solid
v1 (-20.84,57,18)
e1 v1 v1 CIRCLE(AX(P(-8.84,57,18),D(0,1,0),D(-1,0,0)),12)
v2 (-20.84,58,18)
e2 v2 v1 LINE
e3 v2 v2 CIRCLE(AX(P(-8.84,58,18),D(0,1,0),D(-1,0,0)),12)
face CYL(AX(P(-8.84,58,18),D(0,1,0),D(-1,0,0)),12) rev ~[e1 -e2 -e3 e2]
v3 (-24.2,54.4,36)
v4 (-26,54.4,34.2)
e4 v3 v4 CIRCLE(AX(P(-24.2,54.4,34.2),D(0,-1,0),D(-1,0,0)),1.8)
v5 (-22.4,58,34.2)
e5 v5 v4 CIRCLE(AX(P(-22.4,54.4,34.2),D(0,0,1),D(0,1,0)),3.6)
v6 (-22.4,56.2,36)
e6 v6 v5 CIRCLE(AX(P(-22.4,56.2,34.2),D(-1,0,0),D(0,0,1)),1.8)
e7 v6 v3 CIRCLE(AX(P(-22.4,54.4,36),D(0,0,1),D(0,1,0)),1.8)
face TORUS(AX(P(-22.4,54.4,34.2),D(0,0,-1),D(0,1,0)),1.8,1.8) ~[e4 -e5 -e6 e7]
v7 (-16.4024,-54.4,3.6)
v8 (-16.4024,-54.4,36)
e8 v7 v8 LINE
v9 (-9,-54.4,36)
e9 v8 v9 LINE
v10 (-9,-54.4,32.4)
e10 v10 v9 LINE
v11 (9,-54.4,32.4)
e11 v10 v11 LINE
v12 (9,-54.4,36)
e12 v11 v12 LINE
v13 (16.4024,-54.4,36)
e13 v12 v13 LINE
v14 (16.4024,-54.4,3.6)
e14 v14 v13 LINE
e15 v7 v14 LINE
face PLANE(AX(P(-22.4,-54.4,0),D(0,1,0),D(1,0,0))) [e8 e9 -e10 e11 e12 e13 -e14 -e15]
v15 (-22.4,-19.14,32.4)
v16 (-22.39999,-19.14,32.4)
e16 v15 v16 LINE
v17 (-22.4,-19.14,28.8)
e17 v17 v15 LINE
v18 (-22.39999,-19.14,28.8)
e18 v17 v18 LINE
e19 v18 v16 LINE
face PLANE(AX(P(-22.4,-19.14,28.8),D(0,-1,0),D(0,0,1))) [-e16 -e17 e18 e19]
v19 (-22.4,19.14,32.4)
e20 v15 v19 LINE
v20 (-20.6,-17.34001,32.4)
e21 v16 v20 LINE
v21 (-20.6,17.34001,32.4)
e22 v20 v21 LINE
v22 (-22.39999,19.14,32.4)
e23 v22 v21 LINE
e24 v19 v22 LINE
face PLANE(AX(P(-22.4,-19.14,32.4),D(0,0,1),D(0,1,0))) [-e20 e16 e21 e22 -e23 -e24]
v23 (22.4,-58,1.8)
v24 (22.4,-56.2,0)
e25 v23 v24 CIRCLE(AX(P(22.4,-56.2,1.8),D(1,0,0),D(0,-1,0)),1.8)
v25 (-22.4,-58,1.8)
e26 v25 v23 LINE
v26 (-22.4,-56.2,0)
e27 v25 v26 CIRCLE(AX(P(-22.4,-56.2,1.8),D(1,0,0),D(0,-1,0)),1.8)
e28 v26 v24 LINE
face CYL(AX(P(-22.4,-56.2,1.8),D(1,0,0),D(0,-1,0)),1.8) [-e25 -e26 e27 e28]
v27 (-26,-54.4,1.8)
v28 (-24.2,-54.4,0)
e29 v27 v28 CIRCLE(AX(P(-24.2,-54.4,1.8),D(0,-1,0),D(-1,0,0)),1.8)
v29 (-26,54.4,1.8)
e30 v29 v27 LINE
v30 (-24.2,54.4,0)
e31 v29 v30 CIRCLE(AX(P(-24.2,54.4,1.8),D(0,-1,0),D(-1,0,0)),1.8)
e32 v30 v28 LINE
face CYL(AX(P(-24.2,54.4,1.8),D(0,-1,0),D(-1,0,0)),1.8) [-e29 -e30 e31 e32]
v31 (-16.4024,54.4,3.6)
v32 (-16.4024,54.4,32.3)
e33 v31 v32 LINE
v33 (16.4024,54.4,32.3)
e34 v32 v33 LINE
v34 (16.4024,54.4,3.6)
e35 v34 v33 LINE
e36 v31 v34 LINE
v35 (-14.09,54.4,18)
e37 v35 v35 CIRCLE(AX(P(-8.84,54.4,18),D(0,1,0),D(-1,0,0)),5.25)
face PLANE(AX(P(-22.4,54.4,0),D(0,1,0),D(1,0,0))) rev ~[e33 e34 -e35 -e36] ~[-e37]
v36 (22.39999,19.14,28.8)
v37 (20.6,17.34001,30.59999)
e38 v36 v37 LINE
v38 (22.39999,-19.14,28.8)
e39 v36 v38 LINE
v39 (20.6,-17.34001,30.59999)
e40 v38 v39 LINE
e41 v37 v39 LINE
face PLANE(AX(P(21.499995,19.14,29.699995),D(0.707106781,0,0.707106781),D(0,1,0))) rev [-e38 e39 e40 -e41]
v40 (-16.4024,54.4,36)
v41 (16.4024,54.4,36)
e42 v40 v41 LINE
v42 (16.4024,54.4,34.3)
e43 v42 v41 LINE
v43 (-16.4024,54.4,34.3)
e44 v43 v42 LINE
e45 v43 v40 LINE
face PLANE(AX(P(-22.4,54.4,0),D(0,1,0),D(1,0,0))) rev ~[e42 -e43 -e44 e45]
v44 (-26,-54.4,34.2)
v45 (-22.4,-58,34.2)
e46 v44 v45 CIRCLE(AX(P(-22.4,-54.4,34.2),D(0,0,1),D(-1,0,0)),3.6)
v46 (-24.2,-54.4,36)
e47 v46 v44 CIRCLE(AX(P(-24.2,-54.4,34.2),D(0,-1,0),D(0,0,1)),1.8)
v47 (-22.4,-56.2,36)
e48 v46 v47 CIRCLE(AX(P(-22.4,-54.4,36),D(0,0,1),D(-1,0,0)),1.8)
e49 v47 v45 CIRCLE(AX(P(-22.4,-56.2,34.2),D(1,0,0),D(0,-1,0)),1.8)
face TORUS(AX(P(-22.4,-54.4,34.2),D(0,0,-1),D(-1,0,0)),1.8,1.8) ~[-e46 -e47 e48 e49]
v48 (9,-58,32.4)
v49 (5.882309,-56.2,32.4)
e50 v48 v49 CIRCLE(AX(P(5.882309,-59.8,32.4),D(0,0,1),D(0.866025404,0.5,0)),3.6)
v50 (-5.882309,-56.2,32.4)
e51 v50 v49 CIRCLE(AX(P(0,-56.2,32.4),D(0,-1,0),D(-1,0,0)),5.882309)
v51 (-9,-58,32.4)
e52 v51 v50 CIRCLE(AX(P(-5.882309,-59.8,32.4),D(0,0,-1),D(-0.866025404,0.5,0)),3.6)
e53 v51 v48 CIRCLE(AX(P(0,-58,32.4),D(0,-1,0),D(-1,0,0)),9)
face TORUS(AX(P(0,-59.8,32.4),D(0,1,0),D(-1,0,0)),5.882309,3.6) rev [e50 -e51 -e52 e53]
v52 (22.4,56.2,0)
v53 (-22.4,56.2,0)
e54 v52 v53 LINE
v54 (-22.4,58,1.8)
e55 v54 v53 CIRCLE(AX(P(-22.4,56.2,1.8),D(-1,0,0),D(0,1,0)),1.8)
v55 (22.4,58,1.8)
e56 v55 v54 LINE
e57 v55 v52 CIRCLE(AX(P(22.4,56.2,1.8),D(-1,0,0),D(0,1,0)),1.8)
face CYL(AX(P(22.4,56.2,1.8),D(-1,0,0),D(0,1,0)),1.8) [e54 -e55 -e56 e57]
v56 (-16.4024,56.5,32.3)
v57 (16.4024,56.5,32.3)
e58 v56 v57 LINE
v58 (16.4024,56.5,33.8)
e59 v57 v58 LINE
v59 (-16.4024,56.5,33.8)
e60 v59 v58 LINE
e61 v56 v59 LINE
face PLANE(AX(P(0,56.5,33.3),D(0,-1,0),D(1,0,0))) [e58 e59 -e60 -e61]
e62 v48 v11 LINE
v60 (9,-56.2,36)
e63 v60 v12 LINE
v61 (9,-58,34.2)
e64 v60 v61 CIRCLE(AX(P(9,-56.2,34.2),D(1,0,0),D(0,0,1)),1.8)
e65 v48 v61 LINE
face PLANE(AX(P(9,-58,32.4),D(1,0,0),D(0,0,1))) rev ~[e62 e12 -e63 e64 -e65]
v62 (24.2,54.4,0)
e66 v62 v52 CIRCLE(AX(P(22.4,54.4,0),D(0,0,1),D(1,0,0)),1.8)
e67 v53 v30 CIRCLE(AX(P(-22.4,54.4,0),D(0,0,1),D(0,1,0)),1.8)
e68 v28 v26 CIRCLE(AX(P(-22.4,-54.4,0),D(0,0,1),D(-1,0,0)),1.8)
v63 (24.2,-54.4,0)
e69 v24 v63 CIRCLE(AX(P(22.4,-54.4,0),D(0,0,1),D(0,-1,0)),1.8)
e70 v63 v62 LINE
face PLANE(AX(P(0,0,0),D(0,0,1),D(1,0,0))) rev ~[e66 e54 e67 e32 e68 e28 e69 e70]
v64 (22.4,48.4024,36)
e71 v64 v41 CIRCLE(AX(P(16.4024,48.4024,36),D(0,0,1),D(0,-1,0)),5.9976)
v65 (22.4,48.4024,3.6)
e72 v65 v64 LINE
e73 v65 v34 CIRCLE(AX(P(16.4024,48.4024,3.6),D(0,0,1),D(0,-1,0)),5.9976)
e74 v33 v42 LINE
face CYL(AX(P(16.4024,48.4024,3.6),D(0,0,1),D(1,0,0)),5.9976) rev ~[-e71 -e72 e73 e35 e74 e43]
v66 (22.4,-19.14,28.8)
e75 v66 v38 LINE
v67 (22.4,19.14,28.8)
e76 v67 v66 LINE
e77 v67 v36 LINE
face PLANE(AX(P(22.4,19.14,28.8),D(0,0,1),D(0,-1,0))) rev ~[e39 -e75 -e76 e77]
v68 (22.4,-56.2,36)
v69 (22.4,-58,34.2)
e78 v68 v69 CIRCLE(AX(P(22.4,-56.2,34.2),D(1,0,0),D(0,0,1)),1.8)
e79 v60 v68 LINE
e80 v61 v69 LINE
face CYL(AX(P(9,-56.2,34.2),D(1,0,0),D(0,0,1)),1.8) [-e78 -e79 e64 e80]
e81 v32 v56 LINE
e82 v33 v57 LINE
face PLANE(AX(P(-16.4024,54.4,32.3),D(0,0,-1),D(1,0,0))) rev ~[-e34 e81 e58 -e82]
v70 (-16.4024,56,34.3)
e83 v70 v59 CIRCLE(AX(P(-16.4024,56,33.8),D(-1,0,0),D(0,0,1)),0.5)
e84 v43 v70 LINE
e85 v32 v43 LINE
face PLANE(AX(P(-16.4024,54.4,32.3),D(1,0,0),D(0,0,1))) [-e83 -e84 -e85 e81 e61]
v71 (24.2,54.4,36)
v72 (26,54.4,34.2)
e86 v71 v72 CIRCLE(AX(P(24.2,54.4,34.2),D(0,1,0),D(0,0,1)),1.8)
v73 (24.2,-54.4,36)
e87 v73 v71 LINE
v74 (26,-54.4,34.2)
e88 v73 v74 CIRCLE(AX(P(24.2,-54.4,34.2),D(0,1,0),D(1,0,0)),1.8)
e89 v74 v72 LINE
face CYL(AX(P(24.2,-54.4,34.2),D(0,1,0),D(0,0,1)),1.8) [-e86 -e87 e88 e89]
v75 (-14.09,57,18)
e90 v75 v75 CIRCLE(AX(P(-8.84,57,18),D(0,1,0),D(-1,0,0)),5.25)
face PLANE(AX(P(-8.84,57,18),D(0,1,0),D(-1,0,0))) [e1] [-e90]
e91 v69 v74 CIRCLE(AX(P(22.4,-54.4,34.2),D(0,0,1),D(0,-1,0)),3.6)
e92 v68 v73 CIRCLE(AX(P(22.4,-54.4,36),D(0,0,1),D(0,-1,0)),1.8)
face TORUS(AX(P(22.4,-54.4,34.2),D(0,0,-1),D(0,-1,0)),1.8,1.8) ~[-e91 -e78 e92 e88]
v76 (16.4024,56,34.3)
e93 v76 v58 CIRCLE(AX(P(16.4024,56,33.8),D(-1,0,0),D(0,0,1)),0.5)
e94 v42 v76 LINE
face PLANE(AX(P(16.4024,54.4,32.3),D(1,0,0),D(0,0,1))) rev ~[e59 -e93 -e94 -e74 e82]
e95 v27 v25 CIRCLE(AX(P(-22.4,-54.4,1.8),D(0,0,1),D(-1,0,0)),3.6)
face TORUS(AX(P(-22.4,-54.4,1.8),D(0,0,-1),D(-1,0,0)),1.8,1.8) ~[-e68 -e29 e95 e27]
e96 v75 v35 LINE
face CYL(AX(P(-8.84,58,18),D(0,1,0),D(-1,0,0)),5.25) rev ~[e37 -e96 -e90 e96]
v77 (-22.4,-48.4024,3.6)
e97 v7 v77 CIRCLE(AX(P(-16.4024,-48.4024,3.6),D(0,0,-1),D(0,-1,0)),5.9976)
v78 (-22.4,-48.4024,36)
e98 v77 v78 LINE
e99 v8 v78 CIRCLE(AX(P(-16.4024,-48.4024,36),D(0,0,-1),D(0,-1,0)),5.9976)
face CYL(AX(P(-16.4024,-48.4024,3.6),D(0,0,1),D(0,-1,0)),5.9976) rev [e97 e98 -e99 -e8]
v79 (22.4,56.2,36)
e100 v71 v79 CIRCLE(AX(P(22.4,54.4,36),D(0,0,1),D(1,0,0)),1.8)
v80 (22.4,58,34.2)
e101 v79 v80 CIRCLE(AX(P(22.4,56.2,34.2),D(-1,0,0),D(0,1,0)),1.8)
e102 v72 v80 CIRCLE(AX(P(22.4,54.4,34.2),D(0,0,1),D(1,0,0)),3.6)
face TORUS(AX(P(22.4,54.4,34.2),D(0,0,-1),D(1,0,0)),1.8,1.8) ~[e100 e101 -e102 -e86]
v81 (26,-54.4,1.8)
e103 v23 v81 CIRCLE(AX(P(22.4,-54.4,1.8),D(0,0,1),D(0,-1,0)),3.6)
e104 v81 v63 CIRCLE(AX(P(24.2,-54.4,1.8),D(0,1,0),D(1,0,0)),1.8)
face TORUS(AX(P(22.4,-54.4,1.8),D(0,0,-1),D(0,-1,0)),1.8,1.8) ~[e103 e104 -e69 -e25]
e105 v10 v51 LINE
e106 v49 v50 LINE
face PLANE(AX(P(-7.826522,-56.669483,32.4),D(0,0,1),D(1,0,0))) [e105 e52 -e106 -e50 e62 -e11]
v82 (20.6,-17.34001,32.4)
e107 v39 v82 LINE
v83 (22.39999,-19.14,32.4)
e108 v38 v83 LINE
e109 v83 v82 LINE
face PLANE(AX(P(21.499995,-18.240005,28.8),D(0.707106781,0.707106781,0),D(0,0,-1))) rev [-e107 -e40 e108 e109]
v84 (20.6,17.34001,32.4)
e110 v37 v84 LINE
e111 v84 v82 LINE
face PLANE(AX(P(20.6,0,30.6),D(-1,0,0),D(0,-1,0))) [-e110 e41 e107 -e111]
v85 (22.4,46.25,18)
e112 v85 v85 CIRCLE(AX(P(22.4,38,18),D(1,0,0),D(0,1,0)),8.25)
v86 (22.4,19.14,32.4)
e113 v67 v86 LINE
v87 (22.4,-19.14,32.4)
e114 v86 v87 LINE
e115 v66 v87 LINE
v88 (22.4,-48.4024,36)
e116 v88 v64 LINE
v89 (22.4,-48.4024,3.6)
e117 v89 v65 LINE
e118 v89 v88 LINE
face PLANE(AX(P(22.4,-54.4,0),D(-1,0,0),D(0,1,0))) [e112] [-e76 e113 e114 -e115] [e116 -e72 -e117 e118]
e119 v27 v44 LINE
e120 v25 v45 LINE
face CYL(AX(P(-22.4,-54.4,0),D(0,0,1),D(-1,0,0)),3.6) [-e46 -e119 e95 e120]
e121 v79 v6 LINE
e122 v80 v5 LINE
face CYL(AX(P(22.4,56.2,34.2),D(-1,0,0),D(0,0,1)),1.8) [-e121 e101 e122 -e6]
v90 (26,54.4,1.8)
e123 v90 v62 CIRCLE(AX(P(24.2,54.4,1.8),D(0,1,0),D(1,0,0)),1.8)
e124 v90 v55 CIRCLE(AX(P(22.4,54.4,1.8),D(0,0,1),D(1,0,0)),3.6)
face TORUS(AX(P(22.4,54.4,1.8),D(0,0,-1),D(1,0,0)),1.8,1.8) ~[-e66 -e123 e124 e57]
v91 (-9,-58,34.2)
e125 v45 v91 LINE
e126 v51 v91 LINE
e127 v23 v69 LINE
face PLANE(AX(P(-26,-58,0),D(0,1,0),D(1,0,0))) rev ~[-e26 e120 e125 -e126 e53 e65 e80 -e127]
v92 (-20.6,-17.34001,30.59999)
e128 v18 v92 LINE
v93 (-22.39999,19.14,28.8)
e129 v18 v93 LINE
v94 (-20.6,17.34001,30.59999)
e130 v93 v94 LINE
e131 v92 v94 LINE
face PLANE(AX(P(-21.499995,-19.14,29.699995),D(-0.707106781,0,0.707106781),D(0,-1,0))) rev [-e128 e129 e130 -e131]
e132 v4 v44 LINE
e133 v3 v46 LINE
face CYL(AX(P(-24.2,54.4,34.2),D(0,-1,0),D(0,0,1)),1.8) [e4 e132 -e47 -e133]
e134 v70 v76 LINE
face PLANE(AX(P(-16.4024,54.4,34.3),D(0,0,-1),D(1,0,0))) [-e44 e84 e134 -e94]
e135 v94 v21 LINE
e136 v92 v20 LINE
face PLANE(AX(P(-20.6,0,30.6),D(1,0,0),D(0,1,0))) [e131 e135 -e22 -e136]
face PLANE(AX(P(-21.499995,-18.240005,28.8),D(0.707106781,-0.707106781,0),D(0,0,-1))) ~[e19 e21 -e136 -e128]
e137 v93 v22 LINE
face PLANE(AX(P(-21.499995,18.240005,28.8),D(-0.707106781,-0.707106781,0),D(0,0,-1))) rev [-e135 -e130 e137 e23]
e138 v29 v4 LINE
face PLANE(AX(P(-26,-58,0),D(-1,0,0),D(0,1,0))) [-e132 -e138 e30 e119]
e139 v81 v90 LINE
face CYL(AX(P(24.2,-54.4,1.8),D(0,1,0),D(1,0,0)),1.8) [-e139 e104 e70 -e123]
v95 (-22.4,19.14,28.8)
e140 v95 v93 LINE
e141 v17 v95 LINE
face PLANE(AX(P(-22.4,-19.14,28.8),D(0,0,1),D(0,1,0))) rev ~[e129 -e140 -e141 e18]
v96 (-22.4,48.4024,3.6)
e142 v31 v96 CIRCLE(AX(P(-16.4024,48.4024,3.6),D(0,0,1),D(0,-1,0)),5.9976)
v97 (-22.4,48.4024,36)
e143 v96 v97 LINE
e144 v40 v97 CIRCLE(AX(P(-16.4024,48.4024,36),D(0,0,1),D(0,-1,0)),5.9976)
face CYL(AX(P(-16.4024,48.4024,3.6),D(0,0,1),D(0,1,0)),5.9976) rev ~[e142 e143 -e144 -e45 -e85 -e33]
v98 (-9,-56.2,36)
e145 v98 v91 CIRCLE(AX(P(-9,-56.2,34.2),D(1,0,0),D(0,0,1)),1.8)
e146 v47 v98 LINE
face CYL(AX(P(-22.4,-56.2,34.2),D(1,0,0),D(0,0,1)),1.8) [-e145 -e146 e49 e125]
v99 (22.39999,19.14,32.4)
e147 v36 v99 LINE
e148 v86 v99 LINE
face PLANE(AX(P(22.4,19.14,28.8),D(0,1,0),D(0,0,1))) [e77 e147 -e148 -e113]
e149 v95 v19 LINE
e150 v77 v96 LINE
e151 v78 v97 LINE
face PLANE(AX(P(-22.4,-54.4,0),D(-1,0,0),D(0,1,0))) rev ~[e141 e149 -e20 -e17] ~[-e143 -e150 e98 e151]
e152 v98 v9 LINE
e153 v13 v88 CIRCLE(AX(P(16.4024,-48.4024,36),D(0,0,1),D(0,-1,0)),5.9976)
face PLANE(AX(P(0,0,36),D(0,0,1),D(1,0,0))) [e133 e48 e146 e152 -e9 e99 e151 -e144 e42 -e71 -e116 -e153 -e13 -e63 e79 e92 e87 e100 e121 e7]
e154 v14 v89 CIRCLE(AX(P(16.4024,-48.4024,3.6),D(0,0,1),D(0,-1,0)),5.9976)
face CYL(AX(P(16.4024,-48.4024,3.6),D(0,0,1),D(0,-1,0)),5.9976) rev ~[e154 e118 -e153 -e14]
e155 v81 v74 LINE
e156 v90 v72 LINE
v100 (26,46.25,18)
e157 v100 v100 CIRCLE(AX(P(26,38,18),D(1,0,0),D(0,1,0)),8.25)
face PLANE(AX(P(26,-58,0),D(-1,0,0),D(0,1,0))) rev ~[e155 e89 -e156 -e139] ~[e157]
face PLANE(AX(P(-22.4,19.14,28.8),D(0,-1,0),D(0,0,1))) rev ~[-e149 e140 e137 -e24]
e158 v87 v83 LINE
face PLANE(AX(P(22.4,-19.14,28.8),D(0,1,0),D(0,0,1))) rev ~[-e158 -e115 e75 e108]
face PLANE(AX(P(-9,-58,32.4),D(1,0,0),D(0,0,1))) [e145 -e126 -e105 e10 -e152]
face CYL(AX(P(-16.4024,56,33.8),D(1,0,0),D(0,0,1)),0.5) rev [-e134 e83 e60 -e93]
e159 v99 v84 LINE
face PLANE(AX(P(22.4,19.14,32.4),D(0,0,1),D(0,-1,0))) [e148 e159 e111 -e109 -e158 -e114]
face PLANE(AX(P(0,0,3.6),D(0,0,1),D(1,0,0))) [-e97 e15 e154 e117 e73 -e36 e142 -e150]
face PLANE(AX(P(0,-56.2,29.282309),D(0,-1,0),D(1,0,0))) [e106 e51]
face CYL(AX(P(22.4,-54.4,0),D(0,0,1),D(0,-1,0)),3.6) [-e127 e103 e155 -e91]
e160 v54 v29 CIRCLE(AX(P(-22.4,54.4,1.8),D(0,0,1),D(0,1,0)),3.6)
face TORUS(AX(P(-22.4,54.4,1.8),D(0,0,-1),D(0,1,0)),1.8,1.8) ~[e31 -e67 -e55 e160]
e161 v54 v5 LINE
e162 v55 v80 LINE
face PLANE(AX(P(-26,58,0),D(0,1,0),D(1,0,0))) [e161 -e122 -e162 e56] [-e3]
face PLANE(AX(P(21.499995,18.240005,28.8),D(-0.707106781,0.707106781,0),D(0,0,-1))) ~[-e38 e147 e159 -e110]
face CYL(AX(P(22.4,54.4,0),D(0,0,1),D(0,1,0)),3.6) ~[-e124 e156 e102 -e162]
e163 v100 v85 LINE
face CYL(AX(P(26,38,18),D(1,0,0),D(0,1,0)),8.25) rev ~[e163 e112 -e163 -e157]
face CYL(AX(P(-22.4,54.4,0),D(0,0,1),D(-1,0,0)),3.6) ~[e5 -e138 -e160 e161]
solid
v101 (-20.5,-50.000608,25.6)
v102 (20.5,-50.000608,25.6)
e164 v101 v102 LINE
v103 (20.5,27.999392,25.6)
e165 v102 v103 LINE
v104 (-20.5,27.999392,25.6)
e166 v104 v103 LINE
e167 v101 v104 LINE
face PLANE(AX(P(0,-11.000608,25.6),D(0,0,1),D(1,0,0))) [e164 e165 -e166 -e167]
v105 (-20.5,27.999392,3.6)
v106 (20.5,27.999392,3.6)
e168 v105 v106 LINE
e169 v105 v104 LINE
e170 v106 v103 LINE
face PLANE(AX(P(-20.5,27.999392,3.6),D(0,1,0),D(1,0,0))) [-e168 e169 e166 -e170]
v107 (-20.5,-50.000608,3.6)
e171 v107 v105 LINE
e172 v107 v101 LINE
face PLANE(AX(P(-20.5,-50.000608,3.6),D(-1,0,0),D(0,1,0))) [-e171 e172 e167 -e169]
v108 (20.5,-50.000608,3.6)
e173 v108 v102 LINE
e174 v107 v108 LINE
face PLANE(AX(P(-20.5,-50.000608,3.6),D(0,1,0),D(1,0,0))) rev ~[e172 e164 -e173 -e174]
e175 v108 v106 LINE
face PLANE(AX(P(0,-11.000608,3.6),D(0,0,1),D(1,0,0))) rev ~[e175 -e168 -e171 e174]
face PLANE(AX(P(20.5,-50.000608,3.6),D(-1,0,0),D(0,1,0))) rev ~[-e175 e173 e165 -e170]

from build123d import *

# Parameters (mm, degrees)
F2_W         = 52
F2_H         = 116
F2_W_2       = 44.8
F2_H_2       = 108.8
F3_DEPTH     = 36
F4_DEPTH     = 3.6
F7_R         = 3.6
F8_R         = 5.9976
F6_R         = 5.25
F9_DEPTH     = 3.6
F5_R         = 8.25
F10_DEPTH    = 3.6
F11_W        = 18
F11_H        = 3.6
F12_DEPTH    = 3.6
F13_W        = 32.8048
F13_H        = 2
F14_DEPTH    = 2.1
F15_R        = 1.8
F6_R_2       = 12
F17_DEPTH    = 1
F18_R        = 0.5
F19_W        = 38.28
F19_H        = 3.6
F21_DEPTH    = 1.8
F20_W        = 38.28
F20_H        = 3.6
F22_DEPTH    = 1.8
F23_SIZE     = 1.79999
F25_DEPTH    = 1.8
F26_T2_ANGLE = 180
F27_W        = 41
F27_H        = 78
F28_DEPTH    = 22


# Not quite as in the source:
# - a fillet or chamfer that OpenCascade refuses, or shapes differently, is made with other operations: its cross-section is extruded or revolved along the edge and cut away or added
# - a fillet or chamfer is up to 0.001 mm smaller than in the source, because OpenCascade refuses the exact size
# - a feature of the source that left no trace in its solid (it failed there, or was rolled back) is left out


with BuildPart() as f3:
    # F2 (on Top) → F3 (new body)
    with BuildSketch(Plane.XY):
        Rectangle(F2_W, F2_H)
        Rectangle(F2_W_2, F2_H_2, mode=Mode.SUBTRACT)
    extrude(amount=F3_DEPTH)

    # F2 (on Top) → F4 (join)
    with BuildSketch(Plane.XY):
        Rectangle(F2_W_2, F2_H_2)
    extrude(amount=F4_DEPTH)

    # F7
    f7_edges = [f3.edges().sort_by_distance(p)[0] for p in [
        (26, 58, 18),
        (-26, 58, 18),
        (-26, -58, 18),
        (26, -58, 18),
    ]]
    fillet(f7_edges, radius=F7_R)

    # F8
    f8_edges = [f3.edges().sort_by_distance(p)[0] for p in [
        (-22.4, -54.4, 19.8),
        (22.4, -54.4, 19.8),
        (22.4, 54.4, 19.8),
        (-22.4, 54.4, 19.8),
    ]]
    fillet(f8_edges, radius=F8_R)

    # F6 (on face) → F9 (cut)
    with BuildSketch(Plane(origin=(0, 58, 0), x_dir=(-1, 0, 0), z_dir=(0, 1, 0))):
        with Locations((8.84, 18)):
            Circle(F6_R)
    extrude(amount=-F9_DEPTH, mode=Mode.SUBTRACT)

    # F5 (on face) → F10 (cut)
    with BuildSketch(Plane.YZ.offset(26)):
        with Locations((38, 18)):
            Circle(F5_R)
    extrude(amount=-F10_DEPTH, mode=Mode.SUBTRACT)

    # F11 (on face) → F12 (cut)
    with BuildSketch(Plane.XZ.offset(58)):
        with Locations((0, 34.2)):
            Rectangle(F11_W, F11_H)
    extrude(amount=-F12_DEPTH, mode=Mode.SUBTRACT)

    # F13 (on face) → F14 (cut)
    with BuildSketch(Plane.XZ.offset(-54.4)):
        with Locations((0, 33.3)):
            Rectangle(F13_W, F13_H)
    extrude(amount=-F14_DEPTH, mode=Mode.SUBTRACT)

    # F15
    f15_edges = [f3.edges().sort_by_distance(p)[0] for p in [
        (15.7, -58, 36),
        (24.945584, -56.945584, 36),
        (26, 0, 36),
        (-15.7, -58, 36),
        (-24.945584, -56.945584, 36),
        (-26, 0, 36),
        (-24.945584, 56.945584, 36),
        (0, 58, 36),
        (24.945584, 56.945584, 36),
        (0, -58, 0),
        (-24.945584, -56.945584, 0),
        (-26, 0, 0),
        (-24.945584, 56.945584, 0),
        (0, 58, 0),
        (24.945584, 56.945584, 0),
        (26, 0, 0),
        (24.945584, -56.945584, 0),
    ]]
    fillet(f15_edges, radius=F15_R)

    # F6 (on face) → F17 (cut)
    with BuildSketch(Plane(origin=(0, 58, 0), x_dir=(-1, 0, 0), z_dir=(0, 1, 0))):
        with Locations((8.84, 18)):
            Circle(F6_R_2)
        with Locations((8.84, 18)):
            Circle(F6_R, mode=Mode.SUBTRACT)
    extrude(amount=-F17_DEPTH, mode=Mode.SUBTRACT)

    # F18
    f18_edges = [f3.edges().sort_by_distance(p)[0] for p in [
        (0, 56.5, 34.3),
    ]]
    fillet(f18_edges, radius=F18_R)

    # F19 (on face) → F21 (join)
    with BuildSketch(Plane(origin=(22.4, 0, 0), x_dir=(0, -1, 0), z_dir=(-1, 0, 0))):
        with Locations((0, 30.6)):
            Rectangle(F19_W, F19_H)
    extrude(amount=F21_DEPTH)

    # F20 (on face) → F22 (join)
    with BuildSketch(Plane.YZ.offset(-22.4)):
        with Locations((0, 30.6)):
            Rectangle(F20_W, F20_H)
    extrude(amount=F22_DEPTH)

    # F23 (size 1.8 in the source; OpenCascade refuses exactly that, so slightly less here)
    f23_edges = [f3.edges().sort_by_distance(p)[0] for p in [
        (-20.6, -19.14, 30.6),
        (-20.6, 0, 28.8),
        (-20.6, 19.14, 30.6),
        (20.6, 19.14, 30.6),
        (20.6, 0, 28.8),
        (20.6, -19.14, 30.6),
    ]]
    chamfer(f23_edges, length=F23_SIZE)

    # F11 (on face) → F25 (cut)
    with BuildSketch(Plane.XZ.offset(58)):
        with BuildLine():
            ThreePointArc((-9, 32.4), (0, 23.4), (9, 32.4))
            Line((9, 32.4), (-9, 32.4))
        make_face()
    extrude(amount=-F25_DEPTH, mode=Mode.SUBTRACT)

    # F26: fillet of radius 3.6 on 1 edges, made by hand

    # F26_s1 → F26_t2 (revolve)
    with BuildSketch(Plane.XY.offset(32.4)):
        with BuildLine():
            ThreePointArc((-9, -58), (-7.6823085464, -56.6823085464), (-5.8823085464, -56.2))
            Line((-5.8823085464, -56.2), (-9, -56.2))
            Line((-9, -56.2), (-9, -58))
        make_face()
    revolve(axis=Axis((0, -56.2, 32.4), (0, -1, 0)), revolution_arc=F26_T2_ANGLE)


with BuildPart() as f28:
    # F27 (on face) → F28 (new body)
    with BuildSketch(Plane.XY.offset(3.6)):
        with Locations((0, -11.0006080357)):
            Rectangle(F27_W, F27_H)
    extrude(amount=F28_DEPTH)


solid = Compound([f3.part, f28.part])
